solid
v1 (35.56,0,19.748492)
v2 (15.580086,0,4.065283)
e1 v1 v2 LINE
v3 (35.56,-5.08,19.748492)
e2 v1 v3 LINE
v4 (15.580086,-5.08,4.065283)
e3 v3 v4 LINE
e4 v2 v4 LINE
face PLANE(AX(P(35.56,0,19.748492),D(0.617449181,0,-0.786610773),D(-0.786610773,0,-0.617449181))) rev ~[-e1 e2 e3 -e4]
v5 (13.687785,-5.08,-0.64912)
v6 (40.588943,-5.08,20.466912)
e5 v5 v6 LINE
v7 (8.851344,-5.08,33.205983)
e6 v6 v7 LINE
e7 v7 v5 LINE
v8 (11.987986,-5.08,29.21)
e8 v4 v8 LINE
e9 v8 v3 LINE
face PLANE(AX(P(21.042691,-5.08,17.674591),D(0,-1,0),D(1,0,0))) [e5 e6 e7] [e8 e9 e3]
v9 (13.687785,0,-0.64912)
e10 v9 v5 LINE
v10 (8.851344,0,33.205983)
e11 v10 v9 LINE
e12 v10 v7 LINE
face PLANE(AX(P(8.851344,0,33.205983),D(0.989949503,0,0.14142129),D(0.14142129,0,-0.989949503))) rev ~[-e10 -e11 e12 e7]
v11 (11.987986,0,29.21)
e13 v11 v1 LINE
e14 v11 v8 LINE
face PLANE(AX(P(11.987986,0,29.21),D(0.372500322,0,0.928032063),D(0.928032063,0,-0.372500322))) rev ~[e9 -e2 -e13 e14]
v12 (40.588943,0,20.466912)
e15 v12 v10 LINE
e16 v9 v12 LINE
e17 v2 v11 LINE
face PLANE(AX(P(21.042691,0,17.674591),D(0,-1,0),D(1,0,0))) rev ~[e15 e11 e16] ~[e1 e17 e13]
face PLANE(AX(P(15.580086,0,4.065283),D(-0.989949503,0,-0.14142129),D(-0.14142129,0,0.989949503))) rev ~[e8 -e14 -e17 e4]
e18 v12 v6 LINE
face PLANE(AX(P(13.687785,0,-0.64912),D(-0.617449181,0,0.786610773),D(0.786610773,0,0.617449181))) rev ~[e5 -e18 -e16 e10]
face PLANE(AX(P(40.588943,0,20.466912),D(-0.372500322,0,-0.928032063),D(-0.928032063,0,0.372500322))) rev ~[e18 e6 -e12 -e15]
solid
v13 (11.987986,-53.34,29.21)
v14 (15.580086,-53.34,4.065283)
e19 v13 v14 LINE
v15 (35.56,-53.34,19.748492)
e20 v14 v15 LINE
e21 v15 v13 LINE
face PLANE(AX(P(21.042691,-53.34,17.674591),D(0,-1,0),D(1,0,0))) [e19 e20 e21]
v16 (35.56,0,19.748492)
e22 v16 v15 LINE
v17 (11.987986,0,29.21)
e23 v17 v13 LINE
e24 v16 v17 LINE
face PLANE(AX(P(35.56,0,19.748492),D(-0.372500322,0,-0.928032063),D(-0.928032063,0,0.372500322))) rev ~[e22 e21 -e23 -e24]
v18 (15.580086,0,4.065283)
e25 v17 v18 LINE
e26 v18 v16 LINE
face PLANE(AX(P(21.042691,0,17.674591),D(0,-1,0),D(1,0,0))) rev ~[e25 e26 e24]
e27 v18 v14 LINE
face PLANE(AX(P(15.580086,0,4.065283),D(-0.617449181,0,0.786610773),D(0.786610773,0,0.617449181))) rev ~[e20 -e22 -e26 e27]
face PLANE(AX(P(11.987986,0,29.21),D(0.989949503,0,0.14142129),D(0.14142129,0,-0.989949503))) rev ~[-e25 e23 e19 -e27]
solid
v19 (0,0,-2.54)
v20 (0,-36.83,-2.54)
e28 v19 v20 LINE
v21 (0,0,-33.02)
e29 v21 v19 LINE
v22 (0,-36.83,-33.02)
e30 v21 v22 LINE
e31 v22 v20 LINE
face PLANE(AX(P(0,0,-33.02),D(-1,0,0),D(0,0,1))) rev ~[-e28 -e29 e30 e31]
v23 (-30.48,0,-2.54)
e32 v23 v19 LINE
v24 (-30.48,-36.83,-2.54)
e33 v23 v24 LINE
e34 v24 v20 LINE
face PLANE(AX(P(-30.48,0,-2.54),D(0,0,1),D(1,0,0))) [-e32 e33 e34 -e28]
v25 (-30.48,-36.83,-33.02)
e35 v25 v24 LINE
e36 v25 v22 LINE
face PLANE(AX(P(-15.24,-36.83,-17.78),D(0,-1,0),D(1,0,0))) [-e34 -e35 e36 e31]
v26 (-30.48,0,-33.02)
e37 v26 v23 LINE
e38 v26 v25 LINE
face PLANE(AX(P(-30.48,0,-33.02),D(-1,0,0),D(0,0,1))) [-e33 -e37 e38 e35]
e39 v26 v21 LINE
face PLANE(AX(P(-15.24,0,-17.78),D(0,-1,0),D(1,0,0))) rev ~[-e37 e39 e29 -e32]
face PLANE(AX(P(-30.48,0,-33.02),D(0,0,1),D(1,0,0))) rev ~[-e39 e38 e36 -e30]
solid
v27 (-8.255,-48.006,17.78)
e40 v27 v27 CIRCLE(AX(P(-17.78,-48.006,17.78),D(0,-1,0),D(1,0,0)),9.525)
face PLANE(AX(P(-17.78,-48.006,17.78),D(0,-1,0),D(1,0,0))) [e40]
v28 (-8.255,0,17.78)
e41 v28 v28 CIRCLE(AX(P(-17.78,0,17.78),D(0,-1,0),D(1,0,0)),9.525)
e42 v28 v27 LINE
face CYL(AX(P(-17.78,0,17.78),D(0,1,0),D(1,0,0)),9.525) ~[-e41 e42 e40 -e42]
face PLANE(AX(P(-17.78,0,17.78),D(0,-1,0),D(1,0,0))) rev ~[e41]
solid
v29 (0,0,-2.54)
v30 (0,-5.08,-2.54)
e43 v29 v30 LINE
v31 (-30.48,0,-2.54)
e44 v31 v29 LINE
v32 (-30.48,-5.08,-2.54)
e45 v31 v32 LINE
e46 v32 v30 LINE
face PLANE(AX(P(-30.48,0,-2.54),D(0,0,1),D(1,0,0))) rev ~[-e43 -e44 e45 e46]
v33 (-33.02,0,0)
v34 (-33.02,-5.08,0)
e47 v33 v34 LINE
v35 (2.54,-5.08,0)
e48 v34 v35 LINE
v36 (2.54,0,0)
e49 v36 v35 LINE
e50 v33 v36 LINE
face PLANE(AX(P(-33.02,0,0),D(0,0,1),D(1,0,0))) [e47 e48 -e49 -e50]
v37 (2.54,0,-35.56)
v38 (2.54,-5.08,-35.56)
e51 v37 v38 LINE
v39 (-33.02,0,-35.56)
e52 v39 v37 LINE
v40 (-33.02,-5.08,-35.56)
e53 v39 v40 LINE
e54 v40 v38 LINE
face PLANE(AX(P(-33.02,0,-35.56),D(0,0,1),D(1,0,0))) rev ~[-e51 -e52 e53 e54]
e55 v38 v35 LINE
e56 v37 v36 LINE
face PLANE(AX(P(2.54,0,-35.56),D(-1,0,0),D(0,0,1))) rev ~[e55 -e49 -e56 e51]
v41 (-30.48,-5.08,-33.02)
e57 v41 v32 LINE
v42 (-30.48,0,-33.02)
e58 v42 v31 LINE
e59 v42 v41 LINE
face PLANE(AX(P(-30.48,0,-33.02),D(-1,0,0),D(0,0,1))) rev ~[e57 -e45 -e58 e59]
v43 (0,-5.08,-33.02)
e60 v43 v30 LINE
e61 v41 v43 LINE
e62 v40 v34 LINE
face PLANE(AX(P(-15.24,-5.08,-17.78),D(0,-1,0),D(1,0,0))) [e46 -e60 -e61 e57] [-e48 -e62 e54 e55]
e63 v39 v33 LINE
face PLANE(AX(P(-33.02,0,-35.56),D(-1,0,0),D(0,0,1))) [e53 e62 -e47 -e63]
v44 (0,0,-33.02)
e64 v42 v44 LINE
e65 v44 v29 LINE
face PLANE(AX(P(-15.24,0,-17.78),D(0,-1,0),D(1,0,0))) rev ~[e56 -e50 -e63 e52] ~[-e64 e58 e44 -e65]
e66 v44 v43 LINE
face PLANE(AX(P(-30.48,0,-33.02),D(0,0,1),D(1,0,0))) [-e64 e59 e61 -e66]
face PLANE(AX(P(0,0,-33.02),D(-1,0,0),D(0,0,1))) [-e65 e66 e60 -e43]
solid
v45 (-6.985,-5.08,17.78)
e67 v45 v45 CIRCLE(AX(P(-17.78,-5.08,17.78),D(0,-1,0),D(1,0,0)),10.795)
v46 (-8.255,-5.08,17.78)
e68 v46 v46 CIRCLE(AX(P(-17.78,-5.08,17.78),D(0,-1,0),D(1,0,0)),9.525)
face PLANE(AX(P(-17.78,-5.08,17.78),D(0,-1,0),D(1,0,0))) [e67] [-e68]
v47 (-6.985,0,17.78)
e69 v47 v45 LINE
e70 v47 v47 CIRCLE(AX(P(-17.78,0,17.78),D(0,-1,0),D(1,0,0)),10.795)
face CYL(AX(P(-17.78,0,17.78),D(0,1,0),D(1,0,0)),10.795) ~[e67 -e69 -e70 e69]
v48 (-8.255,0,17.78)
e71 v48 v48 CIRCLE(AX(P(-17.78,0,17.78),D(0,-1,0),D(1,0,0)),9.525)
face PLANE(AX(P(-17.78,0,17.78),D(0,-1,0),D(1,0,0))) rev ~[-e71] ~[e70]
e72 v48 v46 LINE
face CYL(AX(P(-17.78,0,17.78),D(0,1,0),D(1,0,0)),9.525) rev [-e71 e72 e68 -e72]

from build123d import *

# Parameters (mm, degrees)
F0_R     = 9.525
F1_DEPTH = 48.006
F0_W     = 30.48
F0_H     = 30.48
F2_DEPTH = 36.83
F3_DEPTH = 53.34
F0_R_2   = 10.795
F4_DEPTH = 5.08
F0_W_2   = 35.56
F0_H_2   = 35.56


# Not quite as in the source:
# - the program builds the solid bodies; features that only make, move or delete a surface that nothing else refers to are left out


with BuildPart() as f1:
    # F0 (on Front) → F1 (new body)
    with BuildSketch(Plane.XZ):
        with Locations((-17.78, 17.78)):
            Circle(F0_R)
    extrude(amount=F1_DEPTH)


with BuildPart() as f2:
    # F0 (on Front) → F2 (new body)
    with BuildSketch(Plane.XZ):
        with Locations((-15.24, -17.78)):
            Rectangle(F0_W, F0_H)
    extrude(amount=F2_DEPTH)


with BuildPart() as f3:
    # F0 (on Front) → F3 (new body)
    with BuildSketch(Plane.XZ):
        Polygon((35.56, 19.7484918216), (11.9879855975, 29.21), (15.5800863581, 4.0652826199), align=None)
    extrude(amount=F3_DEPTH)


with BuildPart() as f4:
    # F0 (on Front) → F4 (new body)
    with BuildSketch(Plane.XZ):
        with Locations((-17.78, 17.78)):
            Circle(F0_R_2)
        with Locations((-17.78, 17.78)):
            Circle(F0_R, mode=Mode.SUBTRACT)
    extrude(amount=F4_DEPTH)


with BuildPart() as f4b:
    # F0 (on Front) → F4, piece 2 (new body)
    with BuildSketch(Plane.XZ):
        with Locations((-15.24, -17.78)):
            Rectangle(F0_W_2, F0_H_2)
        with Locations((-15.24, -17.78)):
            Rectangle(F0_W, F0_H, mode=Mode.SUBTRACT)
    extrude(amount=F4_DEPTH)


with BuildPart() as f4c:
    # F0 (on Front) → F4, piece 3 (new body)
    with BuildSketch(Plane.XZ):
        Polygon((40.588943476, 20.4669119737), (8.8513437572, 33.2059827284), (13.6877847225, -0.6491202606), align=None)
        Polygon((15.5800863581, 4.0652826199), (11.9879855975, 29.21), (35.56, 19.7484918216), align=None, mode=Mode.SUBTRACT)
    extrude(amount=F4_DEPTH)


solid = Compound([f1.part, f2.part, f3.part, f4.part, f4b.part, f4c.part])
